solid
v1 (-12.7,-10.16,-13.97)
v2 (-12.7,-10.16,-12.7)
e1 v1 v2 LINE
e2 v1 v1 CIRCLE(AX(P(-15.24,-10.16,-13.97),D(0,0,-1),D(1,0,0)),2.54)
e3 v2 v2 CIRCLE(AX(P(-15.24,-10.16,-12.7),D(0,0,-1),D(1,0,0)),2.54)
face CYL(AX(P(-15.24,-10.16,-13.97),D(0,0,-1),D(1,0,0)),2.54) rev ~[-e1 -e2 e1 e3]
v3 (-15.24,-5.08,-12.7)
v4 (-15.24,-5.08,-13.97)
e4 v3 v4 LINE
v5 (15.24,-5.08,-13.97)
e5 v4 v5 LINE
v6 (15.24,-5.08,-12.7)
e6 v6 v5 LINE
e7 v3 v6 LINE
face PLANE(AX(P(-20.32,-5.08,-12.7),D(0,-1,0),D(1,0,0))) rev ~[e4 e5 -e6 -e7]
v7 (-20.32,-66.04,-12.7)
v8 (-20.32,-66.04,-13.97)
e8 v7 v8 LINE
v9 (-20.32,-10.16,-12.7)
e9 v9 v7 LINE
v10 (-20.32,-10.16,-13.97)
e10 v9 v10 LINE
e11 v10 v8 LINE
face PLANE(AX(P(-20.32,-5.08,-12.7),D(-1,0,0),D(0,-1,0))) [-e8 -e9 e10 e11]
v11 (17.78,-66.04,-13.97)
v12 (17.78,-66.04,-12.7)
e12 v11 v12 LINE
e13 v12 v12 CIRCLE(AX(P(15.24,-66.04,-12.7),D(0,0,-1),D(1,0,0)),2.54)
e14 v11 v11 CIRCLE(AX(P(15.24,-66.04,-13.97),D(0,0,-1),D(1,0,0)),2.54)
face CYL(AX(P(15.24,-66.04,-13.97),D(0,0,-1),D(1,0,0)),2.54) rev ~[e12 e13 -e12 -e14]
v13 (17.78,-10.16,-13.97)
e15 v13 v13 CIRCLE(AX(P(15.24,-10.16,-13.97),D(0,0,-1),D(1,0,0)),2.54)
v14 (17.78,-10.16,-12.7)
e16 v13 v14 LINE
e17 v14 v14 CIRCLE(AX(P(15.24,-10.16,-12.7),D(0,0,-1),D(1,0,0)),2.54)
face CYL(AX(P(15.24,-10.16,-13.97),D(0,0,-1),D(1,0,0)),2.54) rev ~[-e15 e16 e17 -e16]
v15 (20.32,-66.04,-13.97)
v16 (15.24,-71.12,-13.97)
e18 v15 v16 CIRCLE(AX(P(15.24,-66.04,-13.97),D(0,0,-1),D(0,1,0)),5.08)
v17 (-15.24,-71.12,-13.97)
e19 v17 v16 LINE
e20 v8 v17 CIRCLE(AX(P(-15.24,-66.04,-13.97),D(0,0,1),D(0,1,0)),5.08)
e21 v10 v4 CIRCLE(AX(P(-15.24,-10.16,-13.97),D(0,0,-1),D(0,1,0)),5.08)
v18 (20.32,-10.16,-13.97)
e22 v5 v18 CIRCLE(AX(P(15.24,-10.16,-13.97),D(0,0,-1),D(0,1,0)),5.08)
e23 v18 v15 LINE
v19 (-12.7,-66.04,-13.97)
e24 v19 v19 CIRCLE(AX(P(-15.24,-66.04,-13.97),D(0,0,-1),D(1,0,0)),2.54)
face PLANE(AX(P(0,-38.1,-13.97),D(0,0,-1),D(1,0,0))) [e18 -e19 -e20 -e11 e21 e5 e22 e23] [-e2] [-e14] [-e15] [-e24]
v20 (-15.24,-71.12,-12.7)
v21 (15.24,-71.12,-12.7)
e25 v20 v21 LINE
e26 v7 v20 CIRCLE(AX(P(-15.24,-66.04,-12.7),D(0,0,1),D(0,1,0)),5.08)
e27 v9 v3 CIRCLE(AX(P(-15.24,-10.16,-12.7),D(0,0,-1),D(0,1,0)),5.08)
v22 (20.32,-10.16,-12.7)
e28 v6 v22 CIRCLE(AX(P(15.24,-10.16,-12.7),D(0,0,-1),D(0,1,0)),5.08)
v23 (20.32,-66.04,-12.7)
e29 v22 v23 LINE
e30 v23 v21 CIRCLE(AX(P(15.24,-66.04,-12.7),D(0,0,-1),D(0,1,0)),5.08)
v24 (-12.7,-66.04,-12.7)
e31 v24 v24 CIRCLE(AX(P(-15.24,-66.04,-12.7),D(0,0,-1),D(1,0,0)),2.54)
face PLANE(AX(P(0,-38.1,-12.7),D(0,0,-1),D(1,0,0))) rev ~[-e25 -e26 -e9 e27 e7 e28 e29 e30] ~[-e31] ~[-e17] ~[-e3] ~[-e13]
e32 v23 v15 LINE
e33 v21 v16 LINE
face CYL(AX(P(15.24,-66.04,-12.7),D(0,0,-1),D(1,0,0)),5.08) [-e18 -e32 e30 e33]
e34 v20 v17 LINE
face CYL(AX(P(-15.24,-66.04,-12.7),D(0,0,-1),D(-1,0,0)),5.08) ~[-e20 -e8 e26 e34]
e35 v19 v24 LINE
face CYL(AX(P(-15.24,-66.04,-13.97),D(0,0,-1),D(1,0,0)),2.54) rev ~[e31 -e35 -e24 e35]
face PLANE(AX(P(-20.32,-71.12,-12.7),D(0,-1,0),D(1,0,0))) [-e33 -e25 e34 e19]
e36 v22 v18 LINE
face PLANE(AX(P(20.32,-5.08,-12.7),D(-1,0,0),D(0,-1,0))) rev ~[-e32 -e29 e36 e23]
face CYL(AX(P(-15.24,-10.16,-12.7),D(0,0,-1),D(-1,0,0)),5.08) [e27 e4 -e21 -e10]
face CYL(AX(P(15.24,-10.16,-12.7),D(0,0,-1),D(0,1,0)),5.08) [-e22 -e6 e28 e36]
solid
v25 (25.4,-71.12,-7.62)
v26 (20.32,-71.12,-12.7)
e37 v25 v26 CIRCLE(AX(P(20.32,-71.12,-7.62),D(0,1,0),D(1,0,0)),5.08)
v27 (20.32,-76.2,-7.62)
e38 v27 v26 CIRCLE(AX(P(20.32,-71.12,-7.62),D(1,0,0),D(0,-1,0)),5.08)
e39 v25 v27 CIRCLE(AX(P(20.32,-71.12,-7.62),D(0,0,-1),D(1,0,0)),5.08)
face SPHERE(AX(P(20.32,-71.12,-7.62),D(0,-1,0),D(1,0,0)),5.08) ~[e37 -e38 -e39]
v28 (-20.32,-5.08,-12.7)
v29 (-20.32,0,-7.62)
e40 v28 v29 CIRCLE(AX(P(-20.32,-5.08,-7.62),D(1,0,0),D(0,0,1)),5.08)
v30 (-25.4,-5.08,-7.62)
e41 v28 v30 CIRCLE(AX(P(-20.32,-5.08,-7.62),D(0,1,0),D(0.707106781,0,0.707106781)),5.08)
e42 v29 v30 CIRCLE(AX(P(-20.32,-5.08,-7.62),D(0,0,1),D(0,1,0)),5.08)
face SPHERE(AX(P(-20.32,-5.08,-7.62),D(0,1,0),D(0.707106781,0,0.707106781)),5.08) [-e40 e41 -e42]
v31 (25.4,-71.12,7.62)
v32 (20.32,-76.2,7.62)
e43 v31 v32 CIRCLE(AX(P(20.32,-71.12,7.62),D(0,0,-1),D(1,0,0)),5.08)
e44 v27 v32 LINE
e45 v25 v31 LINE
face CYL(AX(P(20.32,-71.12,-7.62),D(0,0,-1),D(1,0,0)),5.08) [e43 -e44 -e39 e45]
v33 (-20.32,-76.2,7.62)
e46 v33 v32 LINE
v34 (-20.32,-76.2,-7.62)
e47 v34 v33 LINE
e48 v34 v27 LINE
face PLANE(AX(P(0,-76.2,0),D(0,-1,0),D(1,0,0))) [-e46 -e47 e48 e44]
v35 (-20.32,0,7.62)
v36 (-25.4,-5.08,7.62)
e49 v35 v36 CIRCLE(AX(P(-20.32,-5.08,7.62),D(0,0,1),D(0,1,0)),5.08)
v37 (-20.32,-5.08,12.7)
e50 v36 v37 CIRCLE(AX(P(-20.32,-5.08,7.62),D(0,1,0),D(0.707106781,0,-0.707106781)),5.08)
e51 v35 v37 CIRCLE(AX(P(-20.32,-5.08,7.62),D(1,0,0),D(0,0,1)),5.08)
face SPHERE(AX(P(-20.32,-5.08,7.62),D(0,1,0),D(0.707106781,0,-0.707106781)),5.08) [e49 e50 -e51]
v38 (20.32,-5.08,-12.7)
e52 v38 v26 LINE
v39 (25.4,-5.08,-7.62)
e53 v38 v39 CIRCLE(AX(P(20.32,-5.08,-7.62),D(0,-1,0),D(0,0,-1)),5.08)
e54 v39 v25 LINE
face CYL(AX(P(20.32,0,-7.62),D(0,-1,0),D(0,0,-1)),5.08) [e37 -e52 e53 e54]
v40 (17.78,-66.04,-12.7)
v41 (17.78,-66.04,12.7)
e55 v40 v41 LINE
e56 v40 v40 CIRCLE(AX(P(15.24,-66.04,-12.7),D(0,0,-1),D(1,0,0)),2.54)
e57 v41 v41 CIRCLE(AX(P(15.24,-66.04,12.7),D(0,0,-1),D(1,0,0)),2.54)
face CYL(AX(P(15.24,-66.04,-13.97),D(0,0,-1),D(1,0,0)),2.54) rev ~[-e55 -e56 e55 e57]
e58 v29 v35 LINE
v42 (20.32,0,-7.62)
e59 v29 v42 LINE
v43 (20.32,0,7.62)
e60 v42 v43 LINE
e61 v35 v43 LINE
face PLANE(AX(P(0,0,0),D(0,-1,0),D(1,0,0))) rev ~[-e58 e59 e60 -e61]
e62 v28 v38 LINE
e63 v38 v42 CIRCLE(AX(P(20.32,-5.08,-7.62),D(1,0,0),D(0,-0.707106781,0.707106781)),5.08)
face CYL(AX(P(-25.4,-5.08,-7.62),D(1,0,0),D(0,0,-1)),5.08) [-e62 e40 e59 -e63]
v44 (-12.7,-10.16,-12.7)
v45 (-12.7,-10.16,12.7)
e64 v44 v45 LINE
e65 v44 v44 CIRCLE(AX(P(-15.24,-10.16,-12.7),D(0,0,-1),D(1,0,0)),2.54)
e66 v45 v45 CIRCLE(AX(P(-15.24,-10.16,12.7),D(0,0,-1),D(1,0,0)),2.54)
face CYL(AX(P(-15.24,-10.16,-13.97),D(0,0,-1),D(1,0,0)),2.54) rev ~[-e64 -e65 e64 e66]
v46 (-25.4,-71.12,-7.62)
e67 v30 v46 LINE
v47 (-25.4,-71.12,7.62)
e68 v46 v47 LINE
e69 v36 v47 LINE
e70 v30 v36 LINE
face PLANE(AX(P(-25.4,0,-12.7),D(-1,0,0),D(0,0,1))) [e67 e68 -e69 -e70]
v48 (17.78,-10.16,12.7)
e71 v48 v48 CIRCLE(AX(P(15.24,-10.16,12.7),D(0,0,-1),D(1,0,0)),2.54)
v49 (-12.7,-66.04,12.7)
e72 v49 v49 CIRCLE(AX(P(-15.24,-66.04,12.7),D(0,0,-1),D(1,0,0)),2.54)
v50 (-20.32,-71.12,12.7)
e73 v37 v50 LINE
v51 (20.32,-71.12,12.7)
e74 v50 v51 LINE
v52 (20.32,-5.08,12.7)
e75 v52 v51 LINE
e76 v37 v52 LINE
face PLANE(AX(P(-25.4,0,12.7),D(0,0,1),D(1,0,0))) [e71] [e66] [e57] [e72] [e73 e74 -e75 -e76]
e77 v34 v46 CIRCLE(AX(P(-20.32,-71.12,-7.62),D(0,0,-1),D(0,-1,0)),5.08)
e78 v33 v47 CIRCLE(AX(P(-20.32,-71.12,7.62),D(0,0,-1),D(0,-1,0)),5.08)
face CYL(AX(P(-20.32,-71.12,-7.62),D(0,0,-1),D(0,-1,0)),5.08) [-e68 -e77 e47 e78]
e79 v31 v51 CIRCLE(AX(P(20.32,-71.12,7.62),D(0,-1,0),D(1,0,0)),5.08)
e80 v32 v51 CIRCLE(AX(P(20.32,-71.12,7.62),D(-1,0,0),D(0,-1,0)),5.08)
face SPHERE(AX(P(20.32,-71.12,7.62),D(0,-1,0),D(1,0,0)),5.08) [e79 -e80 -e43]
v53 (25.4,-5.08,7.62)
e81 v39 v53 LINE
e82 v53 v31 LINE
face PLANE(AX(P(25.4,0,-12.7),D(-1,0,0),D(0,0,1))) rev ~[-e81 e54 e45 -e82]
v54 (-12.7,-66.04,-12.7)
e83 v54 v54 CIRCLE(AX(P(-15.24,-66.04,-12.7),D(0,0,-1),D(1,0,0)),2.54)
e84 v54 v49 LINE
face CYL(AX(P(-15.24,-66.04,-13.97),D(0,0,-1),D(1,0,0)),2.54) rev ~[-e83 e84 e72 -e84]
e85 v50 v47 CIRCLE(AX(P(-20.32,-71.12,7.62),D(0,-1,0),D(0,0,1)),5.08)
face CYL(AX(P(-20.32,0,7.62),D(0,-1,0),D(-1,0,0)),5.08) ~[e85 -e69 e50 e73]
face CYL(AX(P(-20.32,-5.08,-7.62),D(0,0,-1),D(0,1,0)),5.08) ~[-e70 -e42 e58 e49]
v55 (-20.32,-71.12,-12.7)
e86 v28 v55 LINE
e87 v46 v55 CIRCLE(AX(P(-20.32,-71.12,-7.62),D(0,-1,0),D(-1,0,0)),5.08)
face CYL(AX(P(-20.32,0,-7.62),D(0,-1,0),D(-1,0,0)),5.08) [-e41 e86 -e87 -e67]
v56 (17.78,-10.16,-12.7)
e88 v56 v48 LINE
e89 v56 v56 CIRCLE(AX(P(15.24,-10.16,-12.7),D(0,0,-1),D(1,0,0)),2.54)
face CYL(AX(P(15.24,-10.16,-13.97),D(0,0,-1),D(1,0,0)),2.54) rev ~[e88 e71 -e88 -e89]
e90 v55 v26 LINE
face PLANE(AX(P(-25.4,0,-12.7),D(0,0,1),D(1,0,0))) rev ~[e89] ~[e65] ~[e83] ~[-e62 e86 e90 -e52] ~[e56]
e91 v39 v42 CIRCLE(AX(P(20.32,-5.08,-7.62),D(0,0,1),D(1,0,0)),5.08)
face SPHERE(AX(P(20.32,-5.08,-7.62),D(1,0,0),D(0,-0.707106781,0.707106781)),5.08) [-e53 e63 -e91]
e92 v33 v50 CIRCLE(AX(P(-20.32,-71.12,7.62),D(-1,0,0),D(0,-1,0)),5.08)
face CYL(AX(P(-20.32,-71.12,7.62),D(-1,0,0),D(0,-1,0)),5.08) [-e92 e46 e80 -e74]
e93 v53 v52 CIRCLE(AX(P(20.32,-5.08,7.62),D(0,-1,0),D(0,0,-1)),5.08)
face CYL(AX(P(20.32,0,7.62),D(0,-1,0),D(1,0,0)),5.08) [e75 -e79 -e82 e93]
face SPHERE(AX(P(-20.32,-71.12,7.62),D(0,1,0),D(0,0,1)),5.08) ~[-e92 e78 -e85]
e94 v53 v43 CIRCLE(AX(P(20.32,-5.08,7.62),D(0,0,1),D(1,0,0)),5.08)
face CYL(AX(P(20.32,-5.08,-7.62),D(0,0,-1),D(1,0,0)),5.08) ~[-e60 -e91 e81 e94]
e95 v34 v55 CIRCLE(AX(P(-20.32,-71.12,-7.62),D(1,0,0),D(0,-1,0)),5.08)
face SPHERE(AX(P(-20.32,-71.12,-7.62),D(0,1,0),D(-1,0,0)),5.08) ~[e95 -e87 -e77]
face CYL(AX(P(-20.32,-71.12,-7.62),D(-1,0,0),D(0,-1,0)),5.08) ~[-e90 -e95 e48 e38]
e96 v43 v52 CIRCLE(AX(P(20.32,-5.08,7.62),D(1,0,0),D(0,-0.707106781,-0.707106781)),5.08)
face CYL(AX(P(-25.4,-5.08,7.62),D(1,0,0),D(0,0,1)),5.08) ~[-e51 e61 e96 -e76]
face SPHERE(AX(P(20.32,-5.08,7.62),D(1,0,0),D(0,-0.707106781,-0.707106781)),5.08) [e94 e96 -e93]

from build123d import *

# Parameters (mm, degrees)
F0_W         = 50.8
F0_H         = 25.4
F1_DEPTH     = 76.2
F2_R         = 5.08
F3_T1_DEPTH  = 15.24
F3_T3_DEPTH  = 40.64
F3_S7_W      = 5.08
F3_S7_H      = 5.08
F3_T8_DEPTH  = 5.08
F3_S13_W     = 5.08
F3_S13_H     = 5.08
F3_T14_DEPTH = 5.08
F3_S19_W     = 5.08
F3_S19_H     = 5.08
F3_T20_DEPTH = 5.08
F3_S25_W     = 5.08
F3_S25_H     = 5.08
F3_T26_DEPTH = 5.08
F3_T30_ANGLE = 90
F3_T32_ANGLE = 90
F3_T34_ANGLE = 90
F3_T36_ANGLE = 90
F5_W         = 40.64
F5_H         = 66.04
F6_DEPTH     = 1.27
F7_R         = 5.08
F8_R         = 2.54
F9_DEPTH     = 101.6
F10_R        = 2.54
F11_DEPTH    = 101.6


# Not quite as in the source:
# - a fillet or chamfer that OpenCascade refuses, or shapes differently, is made with other operations: its cross-section is extruded or revolved along the edge and cut away or added
# - two fillets or chamfers of one size are made in one step


with BuildPart() as f1:
    # F0 (on Front) → F1 (new body)
    with BuildSketch(Plane.XZ):
        Rectangle(F0_W, F0_H)
    extrude(amount=F1_DEPTH)

    # F2
    f2_edges = [f1.edges().sort_by_distance(p)[0] for p in [
        (25.4, -38.1, 12.7),
        (0, 0, 12.7),
        (-25.4, -38.1, 12.7),
        (25.4, -38.1, -12.7),
        (-25.4, -38.1, -12.7),
        (0, 0, -12.7),
    ]]
    fillet(f2_edges, radius=F2_R)

    # F3: fillet of radius 5.08 on 12 edges, made by hand

    # F3_s2 → F3_t1 (cut)
    with BuildSketch(Plane.XY.offset(-7.62)):
        with BuildLine():
            ThreePointArc((25.4, -5.08), (23.9121024484, -1.4878975516), (20.32, 0))
            Line((20.32, 0), (25.4, 0))
            Line((25.4, 0), (25.4, -5.08))
        make_face()
        with BuildLine():
            ThreePointArc((25.4, -71.12), (23.9121024484, -74.7121024484), (20.32, -76.2))
            Line((20.32, -76.2), (25.4, -76.2))
            Line((25.4, -76.2), (25.4, -71.12))
        make_face()
        with BuildLine():
            ThreePointArc((-20.32, 0), (-23.9121024484, -1.4878975516), (-25.4, -5.08))
            Line((-25.4, -5.08), (-25.4, 0))
            Line((-25.4, 0), (-20.32, 0))
        make_face()
        with BuildLine():
            ThreePointArc((-20.32, -76.2), (-23.9121024484, -74.7121024484), (-25.4, -71.12))
            Line((-25.4, -71.12), (-25.4, -76.2))
            Line((-25.4, -76.2), (-20.32, -76.2))
        make_face()
    extrude(amount=F3_T1_DEPTH, mode=Mode.SUBTRACT)

    # F3_s4 → F3_t3 (cut)
    with BuildSketch(Plane.YZ.offset(-20.32)):
        with BuildLine():
            ThreePointArc((-76.2, -7.62), (-74.7121024484, -11.2121024484), (-71.12, -12.7))
            Line((-71.12, -12.7), (-76.2, -12.7))
            Line((-76.2, -12.7), (-76.2, -7.62))
        make_face()
        with BuildLine():
            ThreePointArc((-76.2, 7.62), (-74.7121024484, 11.2121024484), (-71.12, 12.7))
            Line((-71.12, 12.7), (-76.2, 12.7))
            Line((-76.2, 12.7), (-76.2, 7.62))
        make_face()
    extrude(amount=F3_T3_DEPTH, mode=Mode.SUBTRACT)


with BuildPart() as f3_tool6:
    # F3_s7 → F3_t8 (new body)
    with BuildSketch(Plane.YZ.offset(20.32)):
        with Locations((-2.54, 10.16)):
            Rectangle(F3_S7_W, F3_S7_H)
    extrude(amount=F3_T8_DEPTH)

    # F3_s9 → F3_t10 (revolve, cut)
    with BuildSketch(Plane(origin=(20.32, -5.08, 7.62), x_dir=(0, -0.7071067812, -0.7071067812), z_dir=(0, -0.7071067812, 0.7071067812))):
        with BuildLine():
            ThreePointArc((0, -5.08), (5.08, 0), (0, 5.08))
            Line((0, 5.08), (0, -5.08))
        make_face()
    revolve(axis=Axis((20.32, -5.08, 7.62), (1, 0, 0)), mode=Mode.SUBTRACT)


with BuildPart() as f1_1:
    add(f1.part)

    # F3_t5: cut F3_tool6
    add(f3_tool6.part, mode=Mode.SUBTRACT)


with BuildPart() as f3_tool12:
    # F3_s13 → F3_t14 (new body)
    with BuildSketch(Plane.XZ.offset(5.08)):
        with Locations((-22.86, 10.16)):
            Rectangle(F3_S13_W, F3_S13_H)
    extrude(amount=-F3_T14_DEPTH)

    # F3_s15 → F3_t16 (revolve, cut)
    with BuildSketch(Plane(origin=(-20.32, -5.08, 7.62), x_dir=(0.7071067812, 0, -0.7071067812), z_dir=(0.7071067812, 0, 0.7071067812))):
        with BuildLine():
            ThreePointArc((0, -5.08), (5.08, 0), (0, 5.08))
            Line((0, 5.08), (0, -5.08))
        make_face()
    revolve(axis=Axis((-20.32, -5.08, 7.62), (0, 1, 0)), mode=Mode.SUBTRACT)


with BuildPart() as f1_2:
    add(f1_1.part)

    # F3_t11: cut F3_tool12
    add(f3_tool12.part, mode=Mode.SUBTRACT)


with BuildPart() as f3_tool18:
    # F3_s19 → F3_t20 (new body)
    with BuildSketch(Plane.XZ.offset(5.08)):
        with Locations((-22.86, -10.16)):
            Rectangle(F3_S19_W, F3_S19_H)
    extrude(amount=-F3_T20_DEPTH)

    # F3_s21 → F3_t22 (revolve, cut)
    with BuildSketch(Plane(origin=(-20.32, -5.08, -7.62), x_dir=(0.7071067812, 0, 0.7071067812), z_dir=(-0.7071067812, 0, 0.7071067812))):
        with BuildLine():
            ThreePointArc((0, -5.08), (5.08, 0), (0, 5.08))
            Line((0, 5.08), (0, -5.08))
        make_face()
    revolve(axis=Axis((-20.32, -5.08, -7.62), (0, 1, 0)), mode=Mode.SUBTRACT)


with BuildPart() as f1_3:
    add(f1_2.part)

    # F3_t17: cut F3_tool18
    add(f3_tool18.part, mode=Mode.SUBTRACT)


with BuildPart() as f3_tool24:
    # F3_s25 → F3_t26 (new body)
    with BuildSketch(Plane.YZ.offset(20.32)):
        with Locations((-2.54, -10.16)):
            Rectangle(F3_S25_W, F3_S25_H)
    extrude(amount=F3_T26_DEPTH)

    # F3_s27 → F3_t28 (revolve, cut)
    with BuildSketch(Plane(origin=(20.32, -5.08, -7.62), x_dir=(0, -0.7071067812, 0.7071067812), z_dir=(0, 0.7071067812, 0.7071067812))):
        with BuildLine():
            ThreePointArc((0, -5.08), (5.08, 0), (0, 5.08))
            Line((0, 5.08), (0, -5.08))
        make_face()
    revolve(axis=Axis((20.32, -5.08, -7.62), (1, 0, 0)), mode=Mode.SUBTRACT)


with BuildPart() as f1_4:
    add(f1_3.part)

    # F3_t23: cut F3_tool24
    add(f3_tool24.part, mode=Mode.SUBTRACT)

    # F3_s29 → F3_t30 (revolve, cut)
    with BuildSketch(Plane.XY.offset(-7.62)):
        with BuildLine():
            ThreePointArc((25.4, -71.12), (23.9121024484, -74.7121024484), (20.32, -76.2))
            Line((20.32, -76.2), (25.4, -76.2))
            Line((25.4, -76.2), (25.4, -71.12))
        make_face()
    revolve(axis=Axis((20.32, -76.2, -7.62), (0, 1, 0)), revolution_arc=F3_T30_ANGLE, mode=Mode.SUBTRACT)

    # F3_s31 → F3_t32 (revolve, cut)
    with BuildSketch(Plane.XY.offset(7.62)):
        with BuildLine():
            ThreePointArc((25.4, -71.12), (23.9121024484, -74.7121024484), (20.32, -76.2))
            Line((20.32, -76.2), (25.4, -76.2))
            Line((25.4, -76.2), (25.4, -71.12))
        make_face()
    revolve(axis=Axis((20.32, -76.2, 7.62), (0, -1, 0)), revolution_arc=F3_T32_ANGLE, mode=Mode.SUBTRACT)

    # F3_s33 → F3_t34 (revolve, cut)
    with BuildSketch(Plane.XY.offset(-7.62)):
        with BuildLine():
            ThreePointArc((-20.32, -76.2), (-23.9121024484, -74.7121024484), (-25.4, -71.12))
            Line((-25.4, -71.12), (-25.4, -76.2))
            Line((-25.4, -76.2), (-20.32, -76.2))
        make_face()
    revolve(axis=Axis((-20.32, -76.2, -7.62), (0, -1, 0)), revolution_arc=F3_T34_ANGLE, mode=Mode.SUBTRACT)

    # F3_s35 → F3_t36 (revolve, cut)
    with BuildSketch(Plane.YZ.offset(-20.32)):
        with BuildLine():
            ThreePointArc((-76.2, 7.62), (-74.7121024484, 11.2121024484), (-71.12, 12.7))
            Line((-71.12, 12.7), (-76.2, 12.7))
            Line((-76.2, 12.7), (-76.2, 7.62))
        make_face()
    revolve(axis=Axis((-20.32, -76.2, 7.62), (0, -1, 0)), revolution_arc=F3_T36_ANGLE, mode=Mode.SUBTRACT)


with BuildPart() as f6:
    # F5 (on face) → F6 (new body)
    with BuildSketch(Plane(origin=(0, 0, -12.7), x_dir=(1, 0, 0), z_dir=(0, 0, -1))):
        with Locations((0, 38.1)):
            Rectangle(F5_W, F5_H)
    extrude(amount=F6_DEPTH)

    # F7
    f7_edges = [f6.edges().sort_by_distance(p)[0] for p in [
        (-20.32, -5.08, -13.335),
        (20.32, -5.08, -13.335),
        (20.32, -71.12, -13.335),
        (-20.32, -71.12, -13.335),
    ]]
    fillet(f7_edges, radius=F7_R)


with BuildPart() as f9_tool:
    # F8 (on face) → F9 (new body)
    with BuildSketch(Plane(origin=(0, 0, -13.97), x_dir=(1, 0, 0), z_dir=(0, 0, -1))):
        with Locations((15.24, 10.16)):
            Circle(F8_R)
        with Locations((15.24, 66.04)):
            Circle(F8_R)
        with Locations((-15.24, 66.04)):
            Circle(F8_R)
        with Locations((-15.24, 10.16)):
            Circle(F8_R)
    extrude(amount=-F9_DEPTH)


with BuildPart() as f1_5:
    add(f1_4.part)

    # F9: cut by f9_tool
    add(f9_tool.part, mode=Mode.SUBTRACT)

    # F10 (on face) → F11 (cut)
    with BuildSketch(Plane(origin=(0, 0, -12.7), x_dir=(1, 0, 0), z_dir=(0, 0, -1))):
        with Locations((15.24, 66.04)):
            Circle(F10_R)
        with Locations((-15.24, 66.04)):
            Circle(F10_R)
        with Locations((15.24, 10.16)):
            Circle(F10_R)
        with Locations((-15.24, 10.16)):
            Circle(F10_R)
    extrude(amount=-F11_DEPTH, mode=Mode.SUBTRACT)


with BuildPart() as f6_1:
    add(f6.part)

    # F9: cut by f9_tool
    add(f9_tool.part, mode=Mode.SUBTRACT)


solid = Compound([f1_5.part, f6_1.part])
